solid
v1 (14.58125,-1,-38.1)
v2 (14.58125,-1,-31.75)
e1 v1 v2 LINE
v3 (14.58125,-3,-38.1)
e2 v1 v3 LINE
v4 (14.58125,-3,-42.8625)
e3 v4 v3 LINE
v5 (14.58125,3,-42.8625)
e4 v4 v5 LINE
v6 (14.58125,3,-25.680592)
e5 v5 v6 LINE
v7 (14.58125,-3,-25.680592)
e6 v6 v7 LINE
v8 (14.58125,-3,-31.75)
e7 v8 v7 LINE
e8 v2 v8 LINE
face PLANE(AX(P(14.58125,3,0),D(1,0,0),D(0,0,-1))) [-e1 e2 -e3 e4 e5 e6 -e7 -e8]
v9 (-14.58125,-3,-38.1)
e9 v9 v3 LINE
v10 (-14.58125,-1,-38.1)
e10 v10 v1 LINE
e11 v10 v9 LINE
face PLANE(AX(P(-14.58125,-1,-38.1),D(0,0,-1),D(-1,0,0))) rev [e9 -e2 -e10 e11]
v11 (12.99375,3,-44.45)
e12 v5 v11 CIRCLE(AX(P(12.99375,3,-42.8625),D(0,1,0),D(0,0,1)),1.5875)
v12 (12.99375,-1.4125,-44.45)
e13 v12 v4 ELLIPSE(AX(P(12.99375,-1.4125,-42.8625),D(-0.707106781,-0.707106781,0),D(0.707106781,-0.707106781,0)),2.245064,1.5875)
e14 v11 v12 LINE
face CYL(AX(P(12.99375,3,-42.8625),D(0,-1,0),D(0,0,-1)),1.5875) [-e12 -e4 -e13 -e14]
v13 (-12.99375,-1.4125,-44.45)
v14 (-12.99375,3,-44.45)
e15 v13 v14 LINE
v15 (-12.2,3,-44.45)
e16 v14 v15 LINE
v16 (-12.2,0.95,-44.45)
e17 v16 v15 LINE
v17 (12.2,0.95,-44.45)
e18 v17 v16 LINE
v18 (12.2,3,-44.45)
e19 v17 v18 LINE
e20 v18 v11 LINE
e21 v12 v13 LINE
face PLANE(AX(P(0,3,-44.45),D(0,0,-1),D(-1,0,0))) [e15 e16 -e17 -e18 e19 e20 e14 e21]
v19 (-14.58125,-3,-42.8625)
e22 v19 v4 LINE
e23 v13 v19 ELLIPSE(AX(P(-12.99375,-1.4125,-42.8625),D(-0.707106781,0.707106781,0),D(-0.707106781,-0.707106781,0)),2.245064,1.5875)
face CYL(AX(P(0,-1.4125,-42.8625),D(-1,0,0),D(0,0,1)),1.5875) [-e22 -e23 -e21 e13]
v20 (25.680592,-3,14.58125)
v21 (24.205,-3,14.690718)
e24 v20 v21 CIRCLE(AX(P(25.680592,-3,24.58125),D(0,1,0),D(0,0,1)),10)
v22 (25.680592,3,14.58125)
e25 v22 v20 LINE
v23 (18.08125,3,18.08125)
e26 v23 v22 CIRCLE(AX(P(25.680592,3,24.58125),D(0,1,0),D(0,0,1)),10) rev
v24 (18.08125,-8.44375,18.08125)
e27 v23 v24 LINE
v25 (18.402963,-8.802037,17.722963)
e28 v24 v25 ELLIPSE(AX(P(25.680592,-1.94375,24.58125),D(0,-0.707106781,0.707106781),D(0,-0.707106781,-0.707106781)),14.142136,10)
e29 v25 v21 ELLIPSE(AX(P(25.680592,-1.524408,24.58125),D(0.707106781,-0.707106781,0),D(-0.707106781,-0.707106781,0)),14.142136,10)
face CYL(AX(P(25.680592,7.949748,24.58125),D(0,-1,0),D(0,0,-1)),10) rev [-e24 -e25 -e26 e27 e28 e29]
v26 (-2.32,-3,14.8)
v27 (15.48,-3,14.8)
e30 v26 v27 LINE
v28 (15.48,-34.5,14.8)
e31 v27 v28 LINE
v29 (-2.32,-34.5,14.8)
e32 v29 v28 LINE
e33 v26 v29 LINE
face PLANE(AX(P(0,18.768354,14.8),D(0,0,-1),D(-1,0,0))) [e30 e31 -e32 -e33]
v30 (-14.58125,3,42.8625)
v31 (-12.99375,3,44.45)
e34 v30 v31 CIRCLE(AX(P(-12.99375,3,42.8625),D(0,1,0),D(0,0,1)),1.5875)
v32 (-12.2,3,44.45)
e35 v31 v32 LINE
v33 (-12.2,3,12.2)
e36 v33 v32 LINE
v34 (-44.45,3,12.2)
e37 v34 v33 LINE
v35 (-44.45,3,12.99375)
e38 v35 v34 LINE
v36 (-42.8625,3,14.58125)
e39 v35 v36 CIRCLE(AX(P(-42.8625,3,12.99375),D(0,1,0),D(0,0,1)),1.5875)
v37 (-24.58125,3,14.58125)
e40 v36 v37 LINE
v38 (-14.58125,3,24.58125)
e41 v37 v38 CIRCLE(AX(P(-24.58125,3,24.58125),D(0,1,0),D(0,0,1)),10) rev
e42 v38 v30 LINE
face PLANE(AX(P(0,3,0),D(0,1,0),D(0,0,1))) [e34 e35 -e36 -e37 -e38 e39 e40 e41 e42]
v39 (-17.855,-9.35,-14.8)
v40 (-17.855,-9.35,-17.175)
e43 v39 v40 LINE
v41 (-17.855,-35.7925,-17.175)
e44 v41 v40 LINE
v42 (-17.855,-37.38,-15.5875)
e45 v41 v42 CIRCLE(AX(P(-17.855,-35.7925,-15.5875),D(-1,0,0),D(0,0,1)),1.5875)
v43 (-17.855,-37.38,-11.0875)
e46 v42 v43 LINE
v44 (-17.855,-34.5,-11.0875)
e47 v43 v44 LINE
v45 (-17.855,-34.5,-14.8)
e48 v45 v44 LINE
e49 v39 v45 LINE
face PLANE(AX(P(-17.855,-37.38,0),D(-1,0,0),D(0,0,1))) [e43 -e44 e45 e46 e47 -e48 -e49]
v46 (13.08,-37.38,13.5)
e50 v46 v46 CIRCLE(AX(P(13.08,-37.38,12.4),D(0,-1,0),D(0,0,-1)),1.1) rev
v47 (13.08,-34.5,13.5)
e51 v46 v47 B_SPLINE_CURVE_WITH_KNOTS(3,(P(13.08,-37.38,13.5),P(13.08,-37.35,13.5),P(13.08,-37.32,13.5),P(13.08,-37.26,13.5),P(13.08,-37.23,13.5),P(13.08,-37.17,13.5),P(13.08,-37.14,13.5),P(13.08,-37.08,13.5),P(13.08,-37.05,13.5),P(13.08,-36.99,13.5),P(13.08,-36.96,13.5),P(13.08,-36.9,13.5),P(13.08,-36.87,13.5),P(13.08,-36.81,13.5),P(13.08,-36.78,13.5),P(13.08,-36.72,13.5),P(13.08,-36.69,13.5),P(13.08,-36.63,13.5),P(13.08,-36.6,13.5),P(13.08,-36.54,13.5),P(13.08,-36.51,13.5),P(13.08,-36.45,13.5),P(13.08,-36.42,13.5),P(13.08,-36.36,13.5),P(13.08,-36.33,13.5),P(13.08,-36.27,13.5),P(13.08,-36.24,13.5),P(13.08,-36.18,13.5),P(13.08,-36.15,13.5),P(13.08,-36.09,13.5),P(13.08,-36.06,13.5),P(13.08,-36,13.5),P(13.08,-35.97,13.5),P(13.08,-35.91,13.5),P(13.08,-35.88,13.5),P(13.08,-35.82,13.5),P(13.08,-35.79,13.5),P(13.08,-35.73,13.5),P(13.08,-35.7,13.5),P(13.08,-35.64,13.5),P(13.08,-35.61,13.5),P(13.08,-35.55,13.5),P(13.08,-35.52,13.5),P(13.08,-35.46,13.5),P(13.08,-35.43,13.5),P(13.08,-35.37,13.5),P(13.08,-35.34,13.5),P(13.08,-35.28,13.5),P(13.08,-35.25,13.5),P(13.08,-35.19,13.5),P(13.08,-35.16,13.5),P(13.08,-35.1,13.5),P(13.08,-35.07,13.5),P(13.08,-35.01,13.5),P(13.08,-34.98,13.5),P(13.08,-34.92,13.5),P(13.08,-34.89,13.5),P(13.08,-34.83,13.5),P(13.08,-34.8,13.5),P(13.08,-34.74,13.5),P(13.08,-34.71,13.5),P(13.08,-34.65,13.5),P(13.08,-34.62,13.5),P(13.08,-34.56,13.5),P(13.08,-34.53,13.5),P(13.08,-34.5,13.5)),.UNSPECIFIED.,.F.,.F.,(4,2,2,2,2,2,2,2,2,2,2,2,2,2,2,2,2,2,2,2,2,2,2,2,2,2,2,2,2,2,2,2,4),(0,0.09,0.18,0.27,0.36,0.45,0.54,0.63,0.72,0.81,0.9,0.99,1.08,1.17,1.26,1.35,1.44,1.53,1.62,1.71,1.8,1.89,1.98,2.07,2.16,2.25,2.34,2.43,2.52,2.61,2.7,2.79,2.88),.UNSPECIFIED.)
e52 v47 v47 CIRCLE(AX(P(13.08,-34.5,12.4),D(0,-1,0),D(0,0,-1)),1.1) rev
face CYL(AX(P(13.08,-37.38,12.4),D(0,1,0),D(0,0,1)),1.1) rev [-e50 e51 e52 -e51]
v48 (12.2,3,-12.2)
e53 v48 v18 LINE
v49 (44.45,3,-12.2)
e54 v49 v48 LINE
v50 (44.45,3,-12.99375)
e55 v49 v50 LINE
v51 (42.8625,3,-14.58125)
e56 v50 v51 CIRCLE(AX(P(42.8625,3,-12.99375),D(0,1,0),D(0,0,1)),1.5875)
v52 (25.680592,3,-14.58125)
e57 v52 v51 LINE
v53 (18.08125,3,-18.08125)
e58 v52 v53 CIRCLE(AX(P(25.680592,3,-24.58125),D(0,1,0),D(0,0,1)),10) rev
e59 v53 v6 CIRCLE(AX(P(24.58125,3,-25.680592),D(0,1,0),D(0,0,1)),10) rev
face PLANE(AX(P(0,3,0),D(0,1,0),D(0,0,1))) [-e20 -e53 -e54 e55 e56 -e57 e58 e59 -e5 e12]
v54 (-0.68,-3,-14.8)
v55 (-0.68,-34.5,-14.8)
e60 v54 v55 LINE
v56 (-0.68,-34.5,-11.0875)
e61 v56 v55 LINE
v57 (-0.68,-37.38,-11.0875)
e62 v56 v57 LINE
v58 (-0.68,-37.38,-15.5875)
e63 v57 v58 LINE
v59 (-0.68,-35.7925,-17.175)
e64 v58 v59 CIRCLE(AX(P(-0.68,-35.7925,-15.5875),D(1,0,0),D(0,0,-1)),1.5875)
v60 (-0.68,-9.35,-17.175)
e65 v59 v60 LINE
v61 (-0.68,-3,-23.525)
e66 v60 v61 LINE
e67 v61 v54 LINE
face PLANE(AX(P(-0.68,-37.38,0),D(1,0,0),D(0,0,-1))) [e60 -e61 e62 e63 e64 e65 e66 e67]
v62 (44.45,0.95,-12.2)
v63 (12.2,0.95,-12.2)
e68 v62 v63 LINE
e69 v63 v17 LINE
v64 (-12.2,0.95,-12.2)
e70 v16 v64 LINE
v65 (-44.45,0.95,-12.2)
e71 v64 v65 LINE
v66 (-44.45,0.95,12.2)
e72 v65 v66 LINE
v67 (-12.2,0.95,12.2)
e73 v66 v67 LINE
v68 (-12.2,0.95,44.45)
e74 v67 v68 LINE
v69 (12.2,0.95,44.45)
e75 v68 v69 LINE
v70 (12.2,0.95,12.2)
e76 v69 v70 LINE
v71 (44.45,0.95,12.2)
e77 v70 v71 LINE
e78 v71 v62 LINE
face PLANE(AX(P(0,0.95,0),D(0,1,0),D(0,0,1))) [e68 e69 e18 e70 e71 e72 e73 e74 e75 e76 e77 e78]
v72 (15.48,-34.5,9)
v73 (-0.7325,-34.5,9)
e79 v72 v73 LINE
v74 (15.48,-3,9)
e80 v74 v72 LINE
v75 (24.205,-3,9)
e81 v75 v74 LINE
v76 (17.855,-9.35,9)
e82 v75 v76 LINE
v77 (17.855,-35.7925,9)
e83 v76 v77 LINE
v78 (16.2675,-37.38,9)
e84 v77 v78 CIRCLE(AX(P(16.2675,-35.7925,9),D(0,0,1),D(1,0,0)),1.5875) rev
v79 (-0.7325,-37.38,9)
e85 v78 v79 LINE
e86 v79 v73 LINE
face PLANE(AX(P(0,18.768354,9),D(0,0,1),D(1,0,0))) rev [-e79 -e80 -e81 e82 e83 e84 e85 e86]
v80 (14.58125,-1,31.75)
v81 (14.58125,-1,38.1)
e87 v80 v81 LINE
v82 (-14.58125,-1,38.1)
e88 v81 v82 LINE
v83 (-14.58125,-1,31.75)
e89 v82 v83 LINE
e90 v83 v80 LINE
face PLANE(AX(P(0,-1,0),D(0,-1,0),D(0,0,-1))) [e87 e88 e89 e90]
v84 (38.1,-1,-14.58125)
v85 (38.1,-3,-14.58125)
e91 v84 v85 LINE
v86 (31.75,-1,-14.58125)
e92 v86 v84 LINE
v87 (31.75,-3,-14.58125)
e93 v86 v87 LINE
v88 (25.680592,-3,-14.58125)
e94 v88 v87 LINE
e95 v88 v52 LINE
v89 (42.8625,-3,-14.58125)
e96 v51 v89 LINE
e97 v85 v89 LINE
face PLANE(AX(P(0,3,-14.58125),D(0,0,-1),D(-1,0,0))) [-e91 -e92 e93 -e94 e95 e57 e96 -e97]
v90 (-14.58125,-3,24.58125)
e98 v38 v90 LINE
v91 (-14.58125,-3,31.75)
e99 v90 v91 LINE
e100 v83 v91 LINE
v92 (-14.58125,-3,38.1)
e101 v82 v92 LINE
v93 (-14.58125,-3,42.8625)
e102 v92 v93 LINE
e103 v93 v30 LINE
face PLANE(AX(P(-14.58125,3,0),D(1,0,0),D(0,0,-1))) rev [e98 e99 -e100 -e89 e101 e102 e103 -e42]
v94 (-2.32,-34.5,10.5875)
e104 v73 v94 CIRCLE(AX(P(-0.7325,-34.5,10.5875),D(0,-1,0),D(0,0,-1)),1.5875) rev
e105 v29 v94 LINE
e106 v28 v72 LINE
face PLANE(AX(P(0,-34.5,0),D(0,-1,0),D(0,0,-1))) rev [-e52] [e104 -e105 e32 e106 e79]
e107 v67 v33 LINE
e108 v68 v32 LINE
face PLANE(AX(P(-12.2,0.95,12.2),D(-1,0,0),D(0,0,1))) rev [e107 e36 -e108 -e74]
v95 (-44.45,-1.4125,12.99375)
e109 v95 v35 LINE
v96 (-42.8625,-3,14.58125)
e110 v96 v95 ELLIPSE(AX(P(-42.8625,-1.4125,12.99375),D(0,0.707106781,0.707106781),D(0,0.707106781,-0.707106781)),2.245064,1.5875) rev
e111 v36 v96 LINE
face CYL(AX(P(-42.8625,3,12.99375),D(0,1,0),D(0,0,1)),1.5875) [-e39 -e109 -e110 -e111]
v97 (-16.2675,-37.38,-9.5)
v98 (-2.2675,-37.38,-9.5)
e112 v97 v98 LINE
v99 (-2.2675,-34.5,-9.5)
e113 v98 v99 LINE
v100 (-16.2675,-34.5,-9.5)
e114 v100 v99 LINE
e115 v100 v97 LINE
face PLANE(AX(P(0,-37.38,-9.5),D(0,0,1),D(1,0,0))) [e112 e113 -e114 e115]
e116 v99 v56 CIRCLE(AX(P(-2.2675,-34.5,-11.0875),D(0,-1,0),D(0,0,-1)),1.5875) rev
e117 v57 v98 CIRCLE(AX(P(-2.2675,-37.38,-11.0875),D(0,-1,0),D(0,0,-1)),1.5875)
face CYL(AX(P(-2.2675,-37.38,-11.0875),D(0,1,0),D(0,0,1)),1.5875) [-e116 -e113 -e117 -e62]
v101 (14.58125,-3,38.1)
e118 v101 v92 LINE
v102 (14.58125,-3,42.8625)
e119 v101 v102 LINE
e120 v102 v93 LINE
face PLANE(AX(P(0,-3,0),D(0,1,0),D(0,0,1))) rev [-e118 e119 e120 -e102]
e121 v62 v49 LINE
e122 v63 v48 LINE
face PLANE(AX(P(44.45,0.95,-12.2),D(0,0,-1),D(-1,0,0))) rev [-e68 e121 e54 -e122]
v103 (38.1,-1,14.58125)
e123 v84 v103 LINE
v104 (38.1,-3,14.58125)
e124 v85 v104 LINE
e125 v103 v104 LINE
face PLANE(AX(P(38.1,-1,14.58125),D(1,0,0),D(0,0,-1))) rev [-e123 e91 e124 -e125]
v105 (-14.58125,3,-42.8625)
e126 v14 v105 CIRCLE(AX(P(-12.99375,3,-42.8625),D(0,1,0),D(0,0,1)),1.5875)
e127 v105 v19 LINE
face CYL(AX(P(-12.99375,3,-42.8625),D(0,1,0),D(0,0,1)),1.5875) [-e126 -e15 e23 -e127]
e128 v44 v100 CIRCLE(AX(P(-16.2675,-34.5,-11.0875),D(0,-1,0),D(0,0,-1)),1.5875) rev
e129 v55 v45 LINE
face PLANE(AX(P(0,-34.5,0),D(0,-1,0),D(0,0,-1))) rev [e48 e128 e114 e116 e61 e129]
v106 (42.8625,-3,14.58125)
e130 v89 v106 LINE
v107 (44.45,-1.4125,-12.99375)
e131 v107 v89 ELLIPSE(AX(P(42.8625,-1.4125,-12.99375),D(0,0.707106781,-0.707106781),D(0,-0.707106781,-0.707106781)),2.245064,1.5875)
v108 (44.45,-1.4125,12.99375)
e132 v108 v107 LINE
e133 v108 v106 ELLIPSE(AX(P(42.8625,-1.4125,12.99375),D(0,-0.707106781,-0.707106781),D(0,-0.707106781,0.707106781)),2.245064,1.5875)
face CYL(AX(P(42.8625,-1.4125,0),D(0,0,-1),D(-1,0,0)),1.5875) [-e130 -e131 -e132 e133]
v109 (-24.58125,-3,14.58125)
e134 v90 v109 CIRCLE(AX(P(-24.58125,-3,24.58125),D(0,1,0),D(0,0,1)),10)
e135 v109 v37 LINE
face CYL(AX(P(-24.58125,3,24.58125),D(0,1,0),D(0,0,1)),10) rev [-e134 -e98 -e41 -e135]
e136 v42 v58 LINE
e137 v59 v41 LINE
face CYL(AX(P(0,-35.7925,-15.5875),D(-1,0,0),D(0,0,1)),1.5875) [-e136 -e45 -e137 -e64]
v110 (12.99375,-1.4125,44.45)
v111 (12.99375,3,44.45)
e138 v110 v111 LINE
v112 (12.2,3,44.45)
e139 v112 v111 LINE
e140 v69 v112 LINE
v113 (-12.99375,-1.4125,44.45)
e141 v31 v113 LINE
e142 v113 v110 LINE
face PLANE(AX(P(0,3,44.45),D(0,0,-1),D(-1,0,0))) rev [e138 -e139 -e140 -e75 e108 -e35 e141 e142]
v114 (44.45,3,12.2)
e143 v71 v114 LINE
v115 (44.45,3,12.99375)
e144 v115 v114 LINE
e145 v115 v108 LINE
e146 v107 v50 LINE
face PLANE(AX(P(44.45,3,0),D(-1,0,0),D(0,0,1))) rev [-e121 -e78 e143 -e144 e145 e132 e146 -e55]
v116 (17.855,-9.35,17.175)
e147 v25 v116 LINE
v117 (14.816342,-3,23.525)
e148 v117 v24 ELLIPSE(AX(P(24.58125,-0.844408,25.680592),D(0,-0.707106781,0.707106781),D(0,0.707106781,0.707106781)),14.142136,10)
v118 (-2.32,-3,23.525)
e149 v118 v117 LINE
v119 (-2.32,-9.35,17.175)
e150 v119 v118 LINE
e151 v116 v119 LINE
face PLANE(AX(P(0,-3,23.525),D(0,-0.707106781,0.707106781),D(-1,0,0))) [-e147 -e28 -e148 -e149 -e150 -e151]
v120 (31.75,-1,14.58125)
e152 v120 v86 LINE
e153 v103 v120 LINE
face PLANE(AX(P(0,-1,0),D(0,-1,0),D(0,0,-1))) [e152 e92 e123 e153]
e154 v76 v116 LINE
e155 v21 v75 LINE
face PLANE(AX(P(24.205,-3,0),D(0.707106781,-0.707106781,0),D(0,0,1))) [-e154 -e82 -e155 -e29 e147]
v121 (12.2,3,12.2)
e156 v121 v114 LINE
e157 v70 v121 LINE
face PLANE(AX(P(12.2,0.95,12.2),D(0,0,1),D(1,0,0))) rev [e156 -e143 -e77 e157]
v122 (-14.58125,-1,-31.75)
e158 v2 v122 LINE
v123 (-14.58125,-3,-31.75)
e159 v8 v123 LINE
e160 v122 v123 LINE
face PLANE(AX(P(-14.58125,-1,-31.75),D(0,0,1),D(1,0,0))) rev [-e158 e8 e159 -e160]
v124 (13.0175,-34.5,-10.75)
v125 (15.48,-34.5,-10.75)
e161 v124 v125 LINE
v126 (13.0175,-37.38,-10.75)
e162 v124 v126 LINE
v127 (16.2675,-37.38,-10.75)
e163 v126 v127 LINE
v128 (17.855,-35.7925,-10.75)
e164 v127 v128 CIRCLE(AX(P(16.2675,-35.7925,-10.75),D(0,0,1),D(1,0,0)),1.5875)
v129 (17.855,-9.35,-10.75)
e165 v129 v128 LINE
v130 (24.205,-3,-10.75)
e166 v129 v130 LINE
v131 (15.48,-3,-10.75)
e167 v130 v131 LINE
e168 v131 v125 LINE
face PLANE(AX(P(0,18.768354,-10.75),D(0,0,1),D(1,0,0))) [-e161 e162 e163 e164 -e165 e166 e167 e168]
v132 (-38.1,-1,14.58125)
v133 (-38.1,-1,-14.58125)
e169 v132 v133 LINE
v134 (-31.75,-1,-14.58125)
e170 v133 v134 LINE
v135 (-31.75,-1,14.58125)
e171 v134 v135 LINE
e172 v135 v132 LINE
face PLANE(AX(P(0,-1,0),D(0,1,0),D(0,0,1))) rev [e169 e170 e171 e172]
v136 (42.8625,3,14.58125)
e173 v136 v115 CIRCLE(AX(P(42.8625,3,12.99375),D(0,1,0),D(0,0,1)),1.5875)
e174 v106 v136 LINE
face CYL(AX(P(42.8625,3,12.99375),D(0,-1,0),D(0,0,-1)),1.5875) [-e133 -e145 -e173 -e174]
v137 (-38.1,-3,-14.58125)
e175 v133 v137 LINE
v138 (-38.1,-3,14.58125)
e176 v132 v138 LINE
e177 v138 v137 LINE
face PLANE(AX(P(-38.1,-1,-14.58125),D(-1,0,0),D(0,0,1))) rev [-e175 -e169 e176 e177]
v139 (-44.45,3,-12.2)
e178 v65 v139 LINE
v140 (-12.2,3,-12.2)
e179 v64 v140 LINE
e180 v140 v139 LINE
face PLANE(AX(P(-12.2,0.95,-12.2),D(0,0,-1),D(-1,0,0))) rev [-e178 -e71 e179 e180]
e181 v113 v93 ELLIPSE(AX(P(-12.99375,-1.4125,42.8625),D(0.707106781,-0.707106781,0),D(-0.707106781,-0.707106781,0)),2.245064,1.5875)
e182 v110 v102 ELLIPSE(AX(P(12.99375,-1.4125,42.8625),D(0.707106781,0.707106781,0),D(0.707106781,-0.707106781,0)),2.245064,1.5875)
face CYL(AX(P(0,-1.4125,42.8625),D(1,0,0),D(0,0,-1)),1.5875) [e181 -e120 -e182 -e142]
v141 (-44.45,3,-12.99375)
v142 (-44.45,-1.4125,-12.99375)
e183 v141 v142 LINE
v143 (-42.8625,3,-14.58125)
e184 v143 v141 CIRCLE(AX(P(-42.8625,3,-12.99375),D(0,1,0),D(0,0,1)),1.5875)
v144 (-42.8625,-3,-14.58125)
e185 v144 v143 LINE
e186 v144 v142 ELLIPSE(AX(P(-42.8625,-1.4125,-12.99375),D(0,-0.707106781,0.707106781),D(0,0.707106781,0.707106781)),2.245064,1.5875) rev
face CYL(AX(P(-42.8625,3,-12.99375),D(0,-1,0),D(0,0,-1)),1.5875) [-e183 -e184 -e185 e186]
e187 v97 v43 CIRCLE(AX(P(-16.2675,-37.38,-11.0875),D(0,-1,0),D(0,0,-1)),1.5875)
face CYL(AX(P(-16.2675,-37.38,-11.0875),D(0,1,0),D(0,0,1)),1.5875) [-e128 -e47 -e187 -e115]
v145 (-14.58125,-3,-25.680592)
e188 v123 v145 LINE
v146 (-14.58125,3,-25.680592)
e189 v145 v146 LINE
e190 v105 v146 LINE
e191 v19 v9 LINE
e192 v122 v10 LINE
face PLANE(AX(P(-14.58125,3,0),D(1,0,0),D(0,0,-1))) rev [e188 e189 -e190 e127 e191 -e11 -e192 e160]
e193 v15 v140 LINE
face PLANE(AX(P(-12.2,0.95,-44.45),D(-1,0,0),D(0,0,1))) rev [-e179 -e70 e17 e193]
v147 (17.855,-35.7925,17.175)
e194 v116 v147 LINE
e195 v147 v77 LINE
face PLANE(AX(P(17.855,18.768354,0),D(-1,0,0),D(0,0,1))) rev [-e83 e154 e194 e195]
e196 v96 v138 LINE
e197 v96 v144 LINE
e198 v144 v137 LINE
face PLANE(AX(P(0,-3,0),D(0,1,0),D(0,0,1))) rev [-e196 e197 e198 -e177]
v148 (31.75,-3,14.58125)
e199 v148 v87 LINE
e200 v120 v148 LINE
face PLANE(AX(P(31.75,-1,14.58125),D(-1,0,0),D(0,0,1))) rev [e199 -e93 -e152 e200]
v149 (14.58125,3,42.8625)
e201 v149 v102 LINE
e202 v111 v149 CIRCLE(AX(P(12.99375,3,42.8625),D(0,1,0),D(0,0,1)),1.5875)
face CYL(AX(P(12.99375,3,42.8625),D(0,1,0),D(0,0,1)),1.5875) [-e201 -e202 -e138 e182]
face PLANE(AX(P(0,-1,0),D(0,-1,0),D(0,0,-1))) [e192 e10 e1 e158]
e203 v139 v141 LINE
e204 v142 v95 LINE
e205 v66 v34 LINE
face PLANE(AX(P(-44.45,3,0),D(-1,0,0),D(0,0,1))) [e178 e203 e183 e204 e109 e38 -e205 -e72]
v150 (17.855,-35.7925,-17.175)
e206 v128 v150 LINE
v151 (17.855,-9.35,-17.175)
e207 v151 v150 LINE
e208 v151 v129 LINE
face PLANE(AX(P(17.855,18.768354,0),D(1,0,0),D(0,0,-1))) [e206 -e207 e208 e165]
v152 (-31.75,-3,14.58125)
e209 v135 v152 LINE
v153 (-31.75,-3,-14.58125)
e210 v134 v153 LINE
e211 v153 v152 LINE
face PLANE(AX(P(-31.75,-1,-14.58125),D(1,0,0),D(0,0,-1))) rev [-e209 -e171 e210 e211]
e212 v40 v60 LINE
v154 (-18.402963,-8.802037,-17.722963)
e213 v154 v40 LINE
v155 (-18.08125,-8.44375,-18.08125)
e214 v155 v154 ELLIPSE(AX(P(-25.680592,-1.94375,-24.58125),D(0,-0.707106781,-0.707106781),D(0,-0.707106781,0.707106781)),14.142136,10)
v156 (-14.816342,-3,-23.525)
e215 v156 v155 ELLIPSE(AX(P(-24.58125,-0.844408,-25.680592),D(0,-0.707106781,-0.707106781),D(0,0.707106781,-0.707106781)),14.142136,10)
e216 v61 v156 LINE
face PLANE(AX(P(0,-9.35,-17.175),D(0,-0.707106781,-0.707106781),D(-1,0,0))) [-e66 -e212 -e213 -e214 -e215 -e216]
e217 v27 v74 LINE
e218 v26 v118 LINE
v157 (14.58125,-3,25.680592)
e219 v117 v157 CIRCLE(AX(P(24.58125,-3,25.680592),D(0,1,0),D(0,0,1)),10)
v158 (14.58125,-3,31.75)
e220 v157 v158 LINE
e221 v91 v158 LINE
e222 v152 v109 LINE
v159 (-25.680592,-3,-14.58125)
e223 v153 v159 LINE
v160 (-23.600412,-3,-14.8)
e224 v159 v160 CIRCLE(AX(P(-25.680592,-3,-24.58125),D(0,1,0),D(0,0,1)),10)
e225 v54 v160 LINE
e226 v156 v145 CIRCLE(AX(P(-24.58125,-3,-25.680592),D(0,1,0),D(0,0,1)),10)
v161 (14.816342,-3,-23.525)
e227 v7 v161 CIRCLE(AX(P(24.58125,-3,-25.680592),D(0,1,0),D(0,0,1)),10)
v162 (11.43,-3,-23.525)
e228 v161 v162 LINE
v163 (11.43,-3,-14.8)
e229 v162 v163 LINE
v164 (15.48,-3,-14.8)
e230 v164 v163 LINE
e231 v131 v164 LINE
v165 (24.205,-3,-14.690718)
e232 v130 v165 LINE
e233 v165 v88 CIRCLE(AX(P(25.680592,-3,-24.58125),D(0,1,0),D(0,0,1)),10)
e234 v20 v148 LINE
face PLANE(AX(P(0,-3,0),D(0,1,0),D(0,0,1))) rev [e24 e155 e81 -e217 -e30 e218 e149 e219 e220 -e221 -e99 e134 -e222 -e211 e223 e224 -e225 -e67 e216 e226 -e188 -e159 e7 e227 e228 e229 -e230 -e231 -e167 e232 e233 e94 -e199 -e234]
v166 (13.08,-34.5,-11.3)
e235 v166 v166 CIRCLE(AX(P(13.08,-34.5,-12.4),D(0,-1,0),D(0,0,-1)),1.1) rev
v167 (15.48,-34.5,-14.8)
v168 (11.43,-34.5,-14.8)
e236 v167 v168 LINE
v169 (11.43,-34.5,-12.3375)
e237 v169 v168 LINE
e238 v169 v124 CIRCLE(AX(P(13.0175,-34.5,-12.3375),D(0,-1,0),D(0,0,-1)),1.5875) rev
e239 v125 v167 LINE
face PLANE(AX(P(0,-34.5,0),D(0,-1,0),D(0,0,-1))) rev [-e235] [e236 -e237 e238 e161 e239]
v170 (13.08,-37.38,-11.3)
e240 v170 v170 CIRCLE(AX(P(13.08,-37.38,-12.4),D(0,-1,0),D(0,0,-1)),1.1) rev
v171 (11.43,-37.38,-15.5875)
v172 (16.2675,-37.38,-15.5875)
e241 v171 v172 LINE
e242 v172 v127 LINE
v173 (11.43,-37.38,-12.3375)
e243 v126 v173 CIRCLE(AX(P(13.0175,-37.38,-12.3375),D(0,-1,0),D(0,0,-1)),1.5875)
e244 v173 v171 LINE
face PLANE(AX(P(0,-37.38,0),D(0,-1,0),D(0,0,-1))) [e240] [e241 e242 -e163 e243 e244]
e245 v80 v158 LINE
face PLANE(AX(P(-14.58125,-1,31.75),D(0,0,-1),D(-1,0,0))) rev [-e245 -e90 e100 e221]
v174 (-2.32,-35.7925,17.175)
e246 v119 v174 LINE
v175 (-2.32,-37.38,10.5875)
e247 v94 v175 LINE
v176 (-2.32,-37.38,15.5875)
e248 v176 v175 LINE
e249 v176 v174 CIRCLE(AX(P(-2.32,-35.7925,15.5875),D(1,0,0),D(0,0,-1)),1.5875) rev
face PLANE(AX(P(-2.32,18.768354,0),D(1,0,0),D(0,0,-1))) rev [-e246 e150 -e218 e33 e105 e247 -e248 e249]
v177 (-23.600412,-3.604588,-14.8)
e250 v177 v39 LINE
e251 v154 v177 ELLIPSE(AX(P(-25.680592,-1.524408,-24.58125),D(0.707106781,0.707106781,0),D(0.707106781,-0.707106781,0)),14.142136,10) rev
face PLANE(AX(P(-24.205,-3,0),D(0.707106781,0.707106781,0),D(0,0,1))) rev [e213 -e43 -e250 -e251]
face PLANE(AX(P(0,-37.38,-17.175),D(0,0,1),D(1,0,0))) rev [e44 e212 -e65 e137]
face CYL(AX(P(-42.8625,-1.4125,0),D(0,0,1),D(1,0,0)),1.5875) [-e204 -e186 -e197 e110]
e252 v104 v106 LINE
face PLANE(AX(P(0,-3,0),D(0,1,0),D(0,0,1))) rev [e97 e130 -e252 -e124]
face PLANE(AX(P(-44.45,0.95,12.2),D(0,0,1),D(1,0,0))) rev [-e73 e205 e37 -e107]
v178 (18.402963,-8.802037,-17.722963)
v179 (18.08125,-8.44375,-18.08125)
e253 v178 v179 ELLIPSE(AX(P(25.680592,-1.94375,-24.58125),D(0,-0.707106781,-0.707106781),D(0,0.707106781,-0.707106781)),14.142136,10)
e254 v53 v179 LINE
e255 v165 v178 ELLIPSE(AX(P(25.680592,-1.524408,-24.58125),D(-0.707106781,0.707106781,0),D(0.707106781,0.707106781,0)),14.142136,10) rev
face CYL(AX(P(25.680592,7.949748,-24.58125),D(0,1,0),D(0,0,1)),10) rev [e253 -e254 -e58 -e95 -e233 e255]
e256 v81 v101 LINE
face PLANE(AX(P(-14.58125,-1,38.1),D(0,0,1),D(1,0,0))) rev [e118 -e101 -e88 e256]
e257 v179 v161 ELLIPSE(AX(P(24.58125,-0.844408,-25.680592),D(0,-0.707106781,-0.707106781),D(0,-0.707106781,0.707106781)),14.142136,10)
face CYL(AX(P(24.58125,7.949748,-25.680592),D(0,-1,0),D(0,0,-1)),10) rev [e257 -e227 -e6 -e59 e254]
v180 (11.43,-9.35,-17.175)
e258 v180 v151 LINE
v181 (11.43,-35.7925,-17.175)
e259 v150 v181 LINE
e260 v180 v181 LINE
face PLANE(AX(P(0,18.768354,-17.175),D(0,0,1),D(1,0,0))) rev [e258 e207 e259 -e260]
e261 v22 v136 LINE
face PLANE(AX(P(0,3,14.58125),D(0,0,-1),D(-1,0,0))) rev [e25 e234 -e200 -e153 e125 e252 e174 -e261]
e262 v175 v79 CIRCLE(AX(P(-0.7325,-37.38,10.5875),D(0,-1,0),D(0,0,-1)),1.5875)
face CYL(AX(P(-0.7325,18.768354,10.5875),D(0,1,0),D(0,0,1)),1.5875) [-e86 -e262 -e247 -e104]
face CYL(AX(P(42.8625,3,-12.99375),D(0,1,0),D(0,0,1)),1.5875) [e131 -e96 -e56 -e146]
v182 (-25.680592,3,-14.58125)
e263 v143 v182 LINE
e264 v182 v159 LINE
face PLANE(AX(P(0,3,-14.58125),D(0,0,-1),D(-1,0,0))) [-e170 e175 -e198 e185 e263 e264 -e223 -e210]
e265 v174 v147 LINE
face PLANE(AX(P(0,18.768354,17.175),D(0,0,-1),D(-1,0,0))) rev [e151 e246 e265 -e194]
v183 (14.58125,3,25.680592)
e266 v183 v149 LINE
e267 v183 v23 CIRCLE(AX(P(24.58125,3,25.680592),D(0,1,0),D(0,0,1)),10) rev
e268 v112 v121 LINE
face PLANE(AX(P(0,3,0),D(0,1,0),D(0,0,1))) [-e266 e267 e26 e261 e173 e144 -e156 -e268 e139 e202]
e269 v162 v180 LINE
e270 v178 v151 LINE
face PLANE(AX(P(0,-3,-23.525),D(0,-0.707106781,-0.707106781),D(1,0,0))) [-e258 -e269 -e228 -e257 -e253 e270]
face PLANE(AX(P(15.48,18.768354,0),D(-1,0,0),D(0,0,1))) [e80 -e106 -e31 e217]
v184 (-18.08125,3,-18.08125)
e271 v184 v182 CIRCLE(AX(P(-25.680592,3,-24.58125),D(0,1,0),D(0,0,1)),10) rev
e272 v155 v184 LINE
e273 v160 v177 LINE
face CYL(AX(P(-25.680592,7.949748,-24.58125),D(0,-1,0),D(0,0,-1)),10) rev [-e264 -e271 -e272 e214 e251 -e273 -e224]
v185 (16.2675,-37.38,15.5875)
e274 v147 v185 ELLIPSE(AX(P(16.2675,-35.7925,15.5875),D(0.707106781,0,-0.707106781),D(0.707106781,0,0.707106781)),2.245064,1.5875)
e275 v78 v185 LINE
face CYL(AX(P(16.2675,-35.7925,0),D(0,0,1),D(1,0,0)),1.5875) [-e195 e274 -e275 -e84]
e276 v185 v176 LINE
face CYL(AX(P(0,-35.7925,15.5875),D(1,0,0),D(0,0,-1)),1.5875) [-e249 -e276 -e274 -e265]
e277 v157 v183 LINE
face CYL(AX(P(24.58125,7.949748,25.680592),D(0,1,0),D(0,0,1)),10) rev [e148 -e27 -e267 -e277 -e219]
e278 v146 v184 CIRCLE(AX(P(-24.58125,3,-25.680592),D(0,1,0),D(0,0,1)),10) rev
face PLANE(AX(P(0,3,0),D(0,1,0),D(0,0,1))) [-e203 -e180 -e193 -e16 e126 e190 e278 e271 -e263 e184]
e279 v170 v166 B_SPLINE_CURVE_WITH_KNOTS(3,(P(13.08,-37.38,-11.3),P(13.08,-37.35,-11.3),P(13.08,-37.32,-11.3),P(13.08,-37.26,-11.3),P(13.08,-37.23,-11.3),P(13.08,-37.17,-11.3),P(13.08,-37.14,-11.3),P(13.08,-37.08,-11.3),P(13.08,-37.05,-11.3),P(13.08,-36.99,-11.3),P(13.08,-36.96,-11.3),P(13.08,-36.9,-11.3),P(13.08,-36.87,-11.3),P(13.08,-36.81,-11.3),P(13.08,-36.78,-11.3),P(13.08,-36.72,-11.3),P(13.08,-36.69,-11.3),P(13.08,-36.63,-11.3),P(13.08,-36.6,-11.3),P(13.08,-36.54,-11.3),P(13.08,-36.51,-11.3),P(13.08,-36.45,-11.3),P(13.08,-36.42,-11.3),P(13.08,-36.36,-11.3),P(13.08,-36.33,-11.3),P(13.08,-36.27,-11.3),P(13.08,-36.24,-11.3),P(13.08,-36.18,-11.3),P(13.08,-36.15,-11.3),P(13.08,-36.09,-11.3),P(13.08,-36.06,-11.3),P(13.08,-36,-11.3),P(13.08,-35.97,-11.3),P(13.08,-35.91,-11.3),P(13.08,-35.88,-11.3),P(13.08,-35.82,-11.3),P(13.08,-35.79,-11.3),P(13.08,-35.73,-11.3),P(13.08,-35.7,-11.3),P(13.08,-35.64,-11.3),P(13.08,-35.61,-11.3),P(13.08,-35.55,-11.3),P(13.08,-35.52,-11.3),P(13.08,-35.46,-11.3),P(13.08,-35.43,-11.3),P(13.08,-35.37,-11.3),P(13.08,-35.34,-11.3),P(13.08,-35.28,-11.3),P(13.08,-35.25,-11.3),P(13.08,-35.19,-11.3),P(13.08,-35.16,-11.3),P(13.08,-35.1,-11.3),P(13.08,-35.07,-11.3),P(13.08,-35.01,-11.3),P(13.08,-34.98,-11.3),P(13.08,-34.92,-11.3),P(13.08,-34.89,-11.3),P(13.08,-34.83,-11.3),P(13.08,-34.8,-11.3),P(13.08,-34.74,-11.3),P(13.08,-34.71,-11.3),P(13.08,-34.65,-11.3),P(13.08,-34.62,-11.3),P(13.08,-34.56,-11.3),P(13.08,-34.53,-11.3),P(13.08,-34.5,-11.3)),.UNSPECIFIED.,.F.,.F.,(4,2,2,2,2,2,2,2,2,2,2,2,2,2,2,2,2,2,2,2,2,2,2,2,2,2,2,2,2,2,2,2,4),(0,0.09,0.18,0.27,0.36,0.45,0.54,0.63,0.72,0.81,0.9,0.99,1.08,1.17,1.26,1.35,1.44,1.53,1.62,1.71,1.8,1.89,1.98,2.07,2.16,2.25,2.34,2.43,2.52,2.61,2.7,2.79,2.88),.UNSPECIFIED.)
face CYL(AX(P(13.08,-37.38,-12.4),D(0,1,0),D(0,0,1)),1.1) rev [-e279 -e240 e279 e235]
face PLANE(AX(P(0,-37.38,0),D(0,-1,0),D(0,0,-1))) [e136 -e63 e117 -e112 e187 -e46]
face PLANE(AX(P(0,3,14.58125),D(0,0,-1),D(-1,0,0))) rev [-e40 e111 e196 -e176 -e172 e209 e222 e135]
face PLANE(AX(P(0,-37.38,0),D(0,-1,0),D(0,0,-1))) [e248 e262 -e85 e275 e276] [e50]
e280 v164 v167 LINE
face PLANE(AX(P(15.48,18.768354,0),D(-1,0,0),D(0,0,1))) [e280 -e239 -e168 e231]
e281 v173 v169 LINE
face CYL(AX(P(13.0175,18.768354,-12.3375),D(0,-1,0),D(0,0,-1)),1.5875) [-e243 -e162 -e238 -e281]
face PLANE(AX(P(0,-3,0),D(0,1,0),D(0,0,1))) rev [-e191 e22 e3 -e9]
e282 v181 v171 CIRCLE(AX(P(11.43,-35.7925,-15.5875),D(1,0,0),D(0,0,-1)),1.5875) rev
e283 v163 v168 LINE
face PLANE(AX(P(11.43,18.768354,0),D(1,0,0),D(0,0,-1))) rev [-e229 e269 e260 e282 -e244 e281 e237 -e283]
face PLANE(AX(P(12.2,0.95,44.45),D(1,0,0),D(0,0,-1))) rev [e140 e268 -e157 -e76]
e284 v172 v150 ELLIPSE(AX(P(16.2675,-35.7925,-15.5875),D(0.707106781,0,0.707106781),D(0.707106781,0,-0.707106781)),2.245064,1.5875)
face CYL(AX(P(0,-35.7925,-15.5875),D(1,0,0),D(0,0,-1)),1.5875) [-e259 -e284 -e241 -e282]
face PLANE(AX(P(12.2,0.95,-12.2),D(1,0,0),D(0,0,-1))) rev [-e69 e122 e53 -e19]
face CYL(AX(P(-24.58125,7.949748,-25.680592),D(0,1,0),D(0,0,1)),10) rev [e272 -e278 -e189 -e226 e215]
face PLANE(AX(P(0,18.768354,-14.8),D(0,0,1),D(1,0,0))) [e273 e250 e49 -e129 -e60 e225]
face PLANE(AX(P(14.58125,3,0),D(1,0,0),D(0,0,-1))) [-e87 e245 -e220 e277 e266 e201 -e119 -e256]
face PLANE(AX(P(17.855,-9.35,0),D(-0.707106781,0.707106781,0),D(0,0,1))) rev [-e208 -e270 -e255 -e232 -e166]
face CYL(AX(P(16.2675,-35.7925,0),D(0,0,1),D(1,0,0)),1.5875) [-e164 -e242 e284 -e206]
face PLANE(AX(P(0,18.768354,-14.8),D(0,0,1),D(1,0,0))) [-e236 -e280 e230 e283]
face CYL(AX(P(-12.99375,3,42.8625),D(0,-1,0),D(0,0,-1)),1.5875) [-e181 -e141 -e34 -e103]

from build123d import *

# Parameters (mm, degrees)
SKETCH1_W           = 29.1625
SKETCH1_H           = 29.86875
SKETCH1_W_2         = 29.86875
SKETCH1_H_2         = 29.1625
BOSS_EXTRUDE1_DEPTH = 3
CUT_EXTRUDE1_DEPTH  = 2.05000004
SKETCH3_W           = 14
SKETCH3_H           = 4.5
SKETCH3_W_2         = 3.25
SKETCH3_H_2         = 3.25
SKETCH3_R           = 1.1
SKETCH3_W_3         = 17
SKETCH3_H_3         = 5
BOSS_EXTRUDE2_DEPTH = 2.88
SKETCH6_W           = 3.500000112
SKETCH6_H           = 3.500000112
BOSS_EXTRUDE3_DEPTH = 6
SKETCH4_W           = 17.175
SKETCH4_H           = 2.375
BOSS_EXTRUDE4_DEPTH = 31.5
FILLET1_R           = 10
CHAMFER1_SIZE       = 6.35
FILLET2_R           = 1.5875
FILLET3_R           = 1.5875
SKETCH7_W           = 29.1625
SKETCH7_H           = 6.35
SKETCH7_W_2         = 6.35
SKETCH7_H_2         = 29.1625
CUT_EXTRUDE2_DEPTH  = 2
FILLET4_R           = 1.5875


with BuildPart() as part:
    # Sketch1 → Boss-Extrude1 (new, symmetric)
    with BuildSketch(Plane(origin=(0, 0, 0), x_dir=(1, 0, 0), z_dir=(0, 1, 0))):
        with Locations((0, -29.515625)):
            Rectangle(SKETCH1_W, SKETCH1_H)
        with Locations((-29.515625, 0)):
            Rectangle(SKETCH1_W_2, SKETCH1_H_2)
        Rectangle(SKETCH1_W, SKETCH1_H_2)
        with Locations((0, 29.515625)):
            Rectangle(SKETCH1_W, SKETCH1_H)
        with Locations((29.515625, 0)):
            Rectangle(SKETCH1_W_2, SKETCH1_H_2)
    extrude(amount=BOSS_EXTRUDE1_DEPTH, both=True)

    # Sketch2 → Cut-Extrude1 (cut)
    with BuildSketch(Plane(origin=(0, 3, 0), x_dir=(1, 0, 0), z_dir=(0, 1, 0))):
        Polygon((12.2, -44.45), (12.2, -12.2), (44.45, -12.2), (44.45, 12.2), (12.2, 12.2), (12.2, 44.45), (-12.2, 44.45), (-12.2, 12.2), (-44.45, 12.2), (-44.45, -12.2), (-12.2, -12.2), (-12.2, -44.45), align=None)
    extrude(amount=-CUT_EXTRUDE1_DEPTH, mode=Mode.SUBTRACT)

    # Sketch6 → Boss-Extrude3 (add)
    with BuildSketch(Plane(origin=(0, -3, 0), x_dir=(-1, 0, 0), z_dir=(0, -1, 0))):
        with Locations((-16.331250056, -16.331250056)):
            Rectangle(SKETCH6_W, SKETCH6_H)
        with Locations((-16.331250056, 16.331250056)):
            Rectangle(SKETCH6_W, SKETCH6_H)
        with Locations((16.331250056, 16.331250056)):
            Rectangle(SKETCH6_W, SKETCH6_H)
    extrude(amount=-BOSS_EXTRUDE3_DEPTH)



with BuildPart() as body_2:
    # Sketch3 → Boss-Extrude2 (new body)
    # profile 1 of 6: a face of its own
    with BuildSketch(Plane.XZ.offset(34.5)):
        Polygon((-17.855, -9.5), (-17.855, -17.175), (-0.68, -17.175), (-0.68, -14), (-14.68, -14), (-14.68, -9.5), align=None)
    # profile 2 of 6: a face of its own
    with BuildSketch(Plane.XZ.offset(34.5)):
        with Locations((-7.68, -11.75)):
            Rectangle(SKETCH3_W, SKETCH3_H)
    # profile 3 of 6: a face of its own
    with BuildSketch(Plane.XZ.offset(34.5)):
        Polygon((14.68, -14), (11.43, -14), (11.43, -17.175), (17.855, -17.175), (17.855, -10.75), (14.68, -10.75), align=None)
    # profile 4 of 6: a face of its own
    with BuildSketch(Plane.XZ.offset(34.5)):
        with Locations((13.055, -12.375)):
            Rectangle(SKETCH3_W_2, SKETCH3_H_2)
        with Locations(Location((13.08, -12.4, 0), (0, 0, 90))):
            Circle(SKETCH3_R, mode=Mode.SUBTRACT)
    # profile 5 of 6: a face of its own
    with BuildSketch(Plane.XZ.offset(34.5)):
        with Locations((6.18, 11.5)):
            Rectangle(SKETCH3_W_3, SKETCH3_H_3)
        with Locations(Location((13.08, 12.4, 0), (0, 0, 90))):
            Circle(SKETCH3_R, mode=Mode.SUBTRACT)
    # profile 6 of 6: a face of its own
    with BuildSketch(Plane.XZ.offset(34.5)):
        Polygon((-2.32, 17.175), (-2.32, 14), (14.68, 14), (14.68, 9), (17.855, 9), (17.855, 17.175), align=None)
    extrude(amount=BOSS_EXTRUDE2_DEPTH)


with BuildPart() as part_1:
    add(part.part)

    add(body_2.part)  # Boss-Extrude4 merges body 2
    # Sketch4 → Boss-Extrude4 (add)
    with BuildSketch(Plane(origin=(0, -34.5, 0), x_dir=(1, 0, 0), z_dir=(0, 1, 0))):
        Polygon((15.48, 10.75), (15.48, 14.8), (11.43, 14.8), (11.43, 17.175), (17.855, 17.175), (17.855, 10.75), align=None)
        Polygon((17.855, -9), (15.48, -9), (15.48, -14.8), (-2.32, -14.8), (-2.32, -17.175), (17.855, -17.175), align=None)
        with Locations((-9.2675, 15.9875)):
            Rectangle(SKETCH4_W, SKETCH4_H)
    extrude(amount=BOSS_EXTRUDE4_DEPTH)

    # Fillet1
    # the kernel refuses this fillet: 10 mm, written as the material it adds along each edge
    with BuildSketch(Plane(origin=(-14.58125, -3, 14.58125), x_dir=(-1, 0, 0), z_dir=(0, 1, 0))) as fillet1_piece_1:
        with BuildLine():
            CenterArc((FILLET1_R, FILLET1_R), FILLET1_R, 180, 90)
            Line((0, FILLET1_R), (-FILLET1_R * 0.02, FILLET1_R))
            Line((-FILLET1_R * 0.02, FILLET1_R), (-FILLET1_R * 0.02, -FILLET1_R * 0.02))
            Line((-FILLET1_R * 0.02, -FILLET1_R * 0.02), (FILLET1_R, -FILLET1_R * 0.02))
            Line((FILLET1_R, -FILLET1_R * 0.02), (FILLET1_R, 0))
        make_face()
    extrude(amount=6)
    with BuildSketch(Plane(origin=(-14.58125, -3, -18.081250112), x_dir=(0, 0, -1), z_dir=(0, 1, 0))) as fillet1_piece_2:
        with BuildLine():
            CenterArc((7.599342173, 10), FILLET1_R, 220.541601029, 49.458398971)
            Line((0, 3.500000112), (-0.151986843, 3.370000114))
            ThreePointArc((-0.151986843, 3.370000114), (-0.2, 1.750000056), (-0.2, 0))
            Line((-0.2, 0), (0, -0.2))
            Line((0, -0.2), (7.599342173, -0.2))
            Line((7.599342173, -0.2), (7.599342173, 0))
        make_face()
    extrude(amount=6)
    with BuildSketch(Plane(origin=(-18.081250112, -3, -14.58125), x_dir=(0, 0, -1), z_dir=(0, 1, 0)), Plane(origin=(14.58125, -3, -18.081250112), x_dir=(1, 0, 0), z_dir=(0, 1, 0))) as fillet1_piece_3:
        with BuildLine():
            CenterArc((10, 7.599342173), FILLET1_R, 180, 49.458398971)
            Line((0, 7.599342173), (-0.2, 7.599342173))
            Line((-0.2, 7.599342173), (-0.2, 0))
            Line((-0.2, 0), (0, -0.2))
            ThreePointArc((0, -0.2), (1.750000056, -0.2), (3.370000114, -0.151986843))
            Line((3.370000114, -0.151986843), (3.500000112, 0))
        make_face()
    extrude(amount=6)
    with BuildSketch(Plane(origin=(18.081250112, -3, -14.58125), x_dir=(0, 0, -1), z_dir=(0, 1, 0)), Plane(origin=(14.58125, -3, 18.081250112), x_dir=(1, 0, 0), z_dir=(0, 1, 0))) as fillet1_piece_4:
        with BuildLine():
            CenterArc((10, -7.599342173), FILLET1_R, 130.541601029, 49.458398971)
            Line((0, -7.599342173), (-0.2, -7.599342173))
            Line((-0.2, -7.599342173), (-0.2, 0))
            Line((-0.2, 0), (0, 0.2))
            ThreePointArc((0, 0.2), (1.750000056, 0.2), (3.370000114, 0.151986843))
            Line((3.370000114, 0.151986843), (3.500000112, 0))
        make_face()
    extrude(amount=6)
    with BuildSketch(Plane(origin=(18.081250112, -3, 14.58125), x_dir=(1, 0, 0), z_dir=(0, 1, 0))) as fillet1_piece_5:
        with BuildLine():
            CenterArc((7.599342173, -10), FILLET1_R, 90, 49.458398971)
            Line((0, -3.500000112), (-0.151986843, -3.370000114))
            ThreePointArc((-0.151986843, -3.370000114), (-0.2, -1.750000056), (-0.2, 0))
            Line((-0.2, 0), (0, 0.2))
            Line((0, 0.2), (7.599342173, 0.2))
            Line((7.599342173, 0.2), (7.599342173, 0))
        make_face()
    extrude(amount=6)

    # Chamfer1
    # the kernel refuses this chamfer: 6.35 mm, written as the material it adds along each edge
    with BuildSketch(Plane(origin=(-2.32, -3, 17.175), x_dir=(0, 0, 1), z_dir=(1, 0, 0))) as chamfer1_piece_1_section:
        Polygon((CHAMFER1_SIZE, 0), (0, CHAMFER1_SIZE), (0, 0), align=None)
    chamfer1_piece_1 = extrude(amount=36.505186974, mode=Mode.PRIVATE)
    chamfer1_piece_1 = chamfer1_piece_1 - Plane(origin=(25.680592285, -3, 24.58125), x_dir=(1, 0, 0), z_dir=(0, -1, 0)) * Cylinder(10, 99, mode=Mode.PRIVATE)
    chamfer1_piece_1 = chamfer1_piece_1 - Plane(origin=(24.58125, -3, 25.680592285), x_dir=(1, 0, 0), z_dir=(0, -1, 0)) * Cylinder(10, 99, mode=Mode.PRIVATE)
    chamfer1_piece_1 = split(chamfer1_piece_1, bisect_by=Plane(origin=(10.9425, -16.2625, 17.175), z_dir=(-0.7071067811865478, 0.7071067811865475, 0)), keep=Keep.TOP, mode=Mode.PRIVATE)
    add(chamfer1_piece_1)
    with BuildSketch(Plane(origin=(17.855, -3, 33.505186974), x_dir=(1, 0, 0), z_dir=(0, 0, -1))) as chamfer1_piece_2_section:
        Polygon((CHAMFER1_SIZE, 0), (0, CHAMFER1_SIZE), (0, 0), align=None)
    chamfer1_piece_2 = extrude(amount=24.505186974, mode=Mode.PRIVATE)
    chamfer1_piece_2 = chamfer1_piece_2 - Plane(origin=(25.680592285, -3, 24.58125), x_dir=(1, 0, 0), z_dir=(0, -1, 0)) * Cylinder(10, 75, mode=Mode.PRIVATE)
    chamfer1_piece_2 = chamfer1_piece_2 - Plane(origin=(24.58125, -3, 25.680592285), x_dir=(1, 0, 0), z_dir=(0, -1, 0)) * Cylinder(10, 75, mode=Mode.PRIVATE)
    chamfer1_piece_2 = split(chamfer1_piece_2, bisect_by=Plane(origin=(17.855, 1.990093487, 28.515093487), z_dir=(0, 0.7071067811865475, -0.7071067811865478)), keep=Keep.TOP, mode=Mode.PRIVATE)
    add(chamfer1_piece_2)
    with BuildSketch(Plane(origin=(-34.185186974, -3, -17.175), x_dir=(0, 0, -1), z_dir=(1, 0, 0))) as chamfer1_piece_3_section:
        Polygon((CHAMFER1_SIZE, 0), (0, -CHAMFER1_SIZE), (0, 0), align=None)
    chamfer1_piece_3 = extrude(amount=33.505186974, mode=Mode.PRIVATE)
    chamfer1_piece_3 = chamfer1_piece_3 - Plane(origin=(-24.58125, -3, -25.680592285), x_dir=(0, 0, -1), z_dir=(0, -1, 0)) * Cylinder(10, 93, mode=Mode.PRIVATE)
    chamfer1_piece_3 = chamfer1_piece_3 - Plane(origin=(-25.680592285, -3, -24.58125), x_dir=(0, 0, -1), z_dir=(0, -1, 0)) * Cylinder(10, 93, mode=Mode.PRIVATE)
    chamfer1_piece_3 = split(chamfer1_piece_3, bisect_by=Plane(origin=(-29.195093487, 1.990093487, -17.175), z_dir=(0.7071067811865476, 0.7071067811865476, 0)), keep=Keep.TOP, mode=Mode.PRIVATE)
    add(chamfer1_piece_3)
    with BuildSketch(Plane(origin=(-34.185186974, -3, -17.175), x_dir=(0, 0, -1), z_dir=(1, 0, 0))) as chamfer1_piece_4_section:
        Polygon((CHAMFER1_SIZE, 0), (0, -CHAMFER1_SIZE), (0, 0), align=None)
    chamfer1_piece_4 = extrude(amount=49.835373947, mode=Mode.PRIVATE)
    chamfer1_piece_4 = chamfer1_piece_4 - Plane(origin=(24.58125, -3, -25.680592285), x_dir=(1, 0, 0), z_dir=(0, -1, 0)) * Cylinder(10, 126, mode=Mode.PRIVATE)
    chamfer1_piece_4 = split(chamfer1_piece_4, bisect_by=Plane(origin=(11.43, -3, -17.175), z_dir=(1, 0, 0)), keep=Keep.TOP, mode=Mode.PRIVATE)
    add(chamfer1_piece_4)
    with BuildSketch(Plane(origin=(-17.855, -3, -14.8), x_dir=(-1, 0, 0), z_dir=(0, 0, -1))) as chamfer1_piece_5_section:
        Polygon((CHAMFER1_SIZE, 0), (0, -CHAMFER1_SIZE), (0, 0), align=None)
    chamfer1_piece_5 = extrude(amount=18.705186974, mode=Mode.PRIVATE)
    chamfer1_piece_5 = chamfer1_piece_5 - Plane(origin=(-24.58125, -3, -25.680592285), x_dir=(0, 0, -1), z_dir=(0, -1, 0)) * Cylinder(10, 63, mode=Mode.PRIVATE)
    chamfer1_piece_5 = chamfer1_piece_5 - Plane(origin=(-25.680592285, -3, -24.58125), x_dir=(0, 0, -1), z_dir=(0, -1, 0)) * Cylinder(10, 63, mode=Mode.PRIVATE)
    chamfer1_piece_5 = split(chamfer1_piece_5, bisect_by=Plane(origin=(-17.855, -7.3625, -19.1625), z_dir=(0, 0.7071067811865475, 0.7071067811865478)), keep=Keep.TOP, mode=Mode.PRIVATE)
    add(chamfer1_piece_5)
    with BuildSketch(Plane(origin=(-4.900186974, -3, -17.175), x_dir=(0, 0, -1), z_dir=(1, 0, 0))) as chamfer1_piece_6_section:
        Polygon((CHAMFER1_SIZE, 0), (0, -CHAMFER1_SIZE), (0, 0), align=None)
    chamfer1_piece_6 = extrude(amount=39.085373947, mode=Mode.PRIVATE)
    chamfer1_piece_6 = split(chamfer1_piece_6, bisect_by=Plane(origin=(-0.68, -3, -17.175), z_dir=(-1, 0, 0)), keep=Keep.TOP, mode=Mode.PRIVATE)
    add(chamfer1_piece_6)
    with BuildSketch(Plane(origin=(11.43, -3, -17.175), x_dir=(0, 0, -1), z_dir=(1, 0, 0))) as chamfer1_piece_7_section:
        Polygon((CHAMFER1_SIZE, 0), (0, -CHAMFER1_SIZE), (0, 0), align=None)
    chamfer1_piece_7 = extrude(amount=22.755186974, mode=Mode.PRIVATE)
    chamfer1_piece_7 = chamfer1_piece_7 - Plane(origin=(24.58125, -3, -25.680592285), x_dir=(1, 0, 0), z_dir=(0, -1, 0)) * Cylinder(10, 71, mode=Mode.PRIVATE)
    chamfer1_piece_7 = chamfer1_piece_7 - Plane(origin=(25.680592285, -3, -24.58125), x_dir=(0, 0, -1), z_dir=(0, -1, 0)) * Cylinder(10, 71, mode=Mode.PRIVATE)
    chamfer1_piece_7 = split(chamfer1_piece_7, bisect_by=Plane(origin=(17.8175, -9.3875, -17.175), z_dir=(-0.7071067811865476, 0.7071067811865476, 0)), keep=Keep.TOP, mode=Mode.PRIVATE)
    add(chamfer1_piece_7)
    with BuildSketch(Plane(origin=(17.855, -3, -33.505186974), x_dir=(1, 0, 0), z_dir=(0, 0, 1))) as chamfer1_piece_8_section:
        Polygon((CHAMFER1_SIZE, 0), (0, -CHAMFER1_SIZE), (0, 0), align=None)
    chamfer1_piece_8 = extrude(amount=22.755186974, mode=Mode.PRIVATE)
    chamfer1_piece_8 = chamfer1_piece_8 - Plane(origin=(24.58125, -3, -25.680592285), x_dir=(1, 0, 0), z_dir=(0, -1, 0)) * Cylinder(10, 71, mode=Mode.PRIVATE)
    chamfer1_piece_8 = chamfer1_piece_8 - Plane(origin=(25.680592285, -3, -24.58125), x_dir=(0, 0, -1), z_dir=(0, -1, 0)) * Cylinder(10, 71, mode=Mode.PRIVATE)
    chamfer1_piece_8 = split(chamfer1_piece_8, bisect_by=Plane(origin=(17.855, 1.990093487, -28.515093487), z_dir=(0, 0.7071067811865475, 0.7071067811865478)), keep=Keep.TOP, mode=Mode.PRIVATE)
    add(chamfer1_piece_8)

    # Fillet2
    fillet2_edges = [part_1.edges().sort_by_distance(p)[0] for p in [
        (-0.68, -35.94, -9.5),
        (-2.32, -35.94, 9),
        (11.43, -35.94, -10.75),
        (-17.855, -35.94, -9.5),
    ]]
    fillet(fillet2_edges, radius=FILLET2_R)

    # Fillet3
    fillet3_edges = [part_1.edges().sort_by_distance(p)[0] for p in [
        (17.855, -37.38, 13.0875),
        (7.7675, -37.38, 17.175),
        (-9.2675, -37.38, -17.175),
        (14.6425, -37.38, -17.175),
        (17.855, -37.38, -13.9625),
    ]]
    fillet(fillet3_edges, radius=FILLET3_R)

    # Sketch7 → Cut-Extrude2 (cut)
    with BuildSketch(Plane(origin=(0, -3, 0), x_dir=(-1, 0, 0), z_dir=(0, -1, 0))):
        with Locations((0, -34.925)):
            Rectangle(SKETCH7_W, SKETCH7_H)
        with Locations((-34.925, 0)):
            Rectangle(SKETCH7_W_2, SKETCH7_H_2)
        with Locations((0, 34.925)):
            Rectangle(SKETCH7_W, SKETCH7_H)
        with Locations((34.925, 0)):
            Rectangle(SKETCH7_W_2, SKETCH7_H_2)
    extrude(amount=-CUT_EXTRUDE2_DEPTH, mode=Mode.SUBTRACT)

    # Fillet4
    fillet4_edges = [part_1.edges().sort_by_distance(p)[0] for p in [
        (14.58125, 0, 44.45),
        (44.45, 0, 14.58125),
        (44.45, -3, 0),
        (44.45, 0, -14.58125),
        (14.58125, 0, -44.45),
        (-14.58125, 0, -44.45),
        (-44.45, 0, -14.58125),
        (-44.45, 0, 14.58125),
        (-14.58125, 0, 44.45),
        (0, -3, 44.45),
        (-44.45, -3, 0),
        (0, -3, -44.45),
    ]]
    fillet(fillet4_edges, radius=FILLET4_R)


solid = part_1.part
